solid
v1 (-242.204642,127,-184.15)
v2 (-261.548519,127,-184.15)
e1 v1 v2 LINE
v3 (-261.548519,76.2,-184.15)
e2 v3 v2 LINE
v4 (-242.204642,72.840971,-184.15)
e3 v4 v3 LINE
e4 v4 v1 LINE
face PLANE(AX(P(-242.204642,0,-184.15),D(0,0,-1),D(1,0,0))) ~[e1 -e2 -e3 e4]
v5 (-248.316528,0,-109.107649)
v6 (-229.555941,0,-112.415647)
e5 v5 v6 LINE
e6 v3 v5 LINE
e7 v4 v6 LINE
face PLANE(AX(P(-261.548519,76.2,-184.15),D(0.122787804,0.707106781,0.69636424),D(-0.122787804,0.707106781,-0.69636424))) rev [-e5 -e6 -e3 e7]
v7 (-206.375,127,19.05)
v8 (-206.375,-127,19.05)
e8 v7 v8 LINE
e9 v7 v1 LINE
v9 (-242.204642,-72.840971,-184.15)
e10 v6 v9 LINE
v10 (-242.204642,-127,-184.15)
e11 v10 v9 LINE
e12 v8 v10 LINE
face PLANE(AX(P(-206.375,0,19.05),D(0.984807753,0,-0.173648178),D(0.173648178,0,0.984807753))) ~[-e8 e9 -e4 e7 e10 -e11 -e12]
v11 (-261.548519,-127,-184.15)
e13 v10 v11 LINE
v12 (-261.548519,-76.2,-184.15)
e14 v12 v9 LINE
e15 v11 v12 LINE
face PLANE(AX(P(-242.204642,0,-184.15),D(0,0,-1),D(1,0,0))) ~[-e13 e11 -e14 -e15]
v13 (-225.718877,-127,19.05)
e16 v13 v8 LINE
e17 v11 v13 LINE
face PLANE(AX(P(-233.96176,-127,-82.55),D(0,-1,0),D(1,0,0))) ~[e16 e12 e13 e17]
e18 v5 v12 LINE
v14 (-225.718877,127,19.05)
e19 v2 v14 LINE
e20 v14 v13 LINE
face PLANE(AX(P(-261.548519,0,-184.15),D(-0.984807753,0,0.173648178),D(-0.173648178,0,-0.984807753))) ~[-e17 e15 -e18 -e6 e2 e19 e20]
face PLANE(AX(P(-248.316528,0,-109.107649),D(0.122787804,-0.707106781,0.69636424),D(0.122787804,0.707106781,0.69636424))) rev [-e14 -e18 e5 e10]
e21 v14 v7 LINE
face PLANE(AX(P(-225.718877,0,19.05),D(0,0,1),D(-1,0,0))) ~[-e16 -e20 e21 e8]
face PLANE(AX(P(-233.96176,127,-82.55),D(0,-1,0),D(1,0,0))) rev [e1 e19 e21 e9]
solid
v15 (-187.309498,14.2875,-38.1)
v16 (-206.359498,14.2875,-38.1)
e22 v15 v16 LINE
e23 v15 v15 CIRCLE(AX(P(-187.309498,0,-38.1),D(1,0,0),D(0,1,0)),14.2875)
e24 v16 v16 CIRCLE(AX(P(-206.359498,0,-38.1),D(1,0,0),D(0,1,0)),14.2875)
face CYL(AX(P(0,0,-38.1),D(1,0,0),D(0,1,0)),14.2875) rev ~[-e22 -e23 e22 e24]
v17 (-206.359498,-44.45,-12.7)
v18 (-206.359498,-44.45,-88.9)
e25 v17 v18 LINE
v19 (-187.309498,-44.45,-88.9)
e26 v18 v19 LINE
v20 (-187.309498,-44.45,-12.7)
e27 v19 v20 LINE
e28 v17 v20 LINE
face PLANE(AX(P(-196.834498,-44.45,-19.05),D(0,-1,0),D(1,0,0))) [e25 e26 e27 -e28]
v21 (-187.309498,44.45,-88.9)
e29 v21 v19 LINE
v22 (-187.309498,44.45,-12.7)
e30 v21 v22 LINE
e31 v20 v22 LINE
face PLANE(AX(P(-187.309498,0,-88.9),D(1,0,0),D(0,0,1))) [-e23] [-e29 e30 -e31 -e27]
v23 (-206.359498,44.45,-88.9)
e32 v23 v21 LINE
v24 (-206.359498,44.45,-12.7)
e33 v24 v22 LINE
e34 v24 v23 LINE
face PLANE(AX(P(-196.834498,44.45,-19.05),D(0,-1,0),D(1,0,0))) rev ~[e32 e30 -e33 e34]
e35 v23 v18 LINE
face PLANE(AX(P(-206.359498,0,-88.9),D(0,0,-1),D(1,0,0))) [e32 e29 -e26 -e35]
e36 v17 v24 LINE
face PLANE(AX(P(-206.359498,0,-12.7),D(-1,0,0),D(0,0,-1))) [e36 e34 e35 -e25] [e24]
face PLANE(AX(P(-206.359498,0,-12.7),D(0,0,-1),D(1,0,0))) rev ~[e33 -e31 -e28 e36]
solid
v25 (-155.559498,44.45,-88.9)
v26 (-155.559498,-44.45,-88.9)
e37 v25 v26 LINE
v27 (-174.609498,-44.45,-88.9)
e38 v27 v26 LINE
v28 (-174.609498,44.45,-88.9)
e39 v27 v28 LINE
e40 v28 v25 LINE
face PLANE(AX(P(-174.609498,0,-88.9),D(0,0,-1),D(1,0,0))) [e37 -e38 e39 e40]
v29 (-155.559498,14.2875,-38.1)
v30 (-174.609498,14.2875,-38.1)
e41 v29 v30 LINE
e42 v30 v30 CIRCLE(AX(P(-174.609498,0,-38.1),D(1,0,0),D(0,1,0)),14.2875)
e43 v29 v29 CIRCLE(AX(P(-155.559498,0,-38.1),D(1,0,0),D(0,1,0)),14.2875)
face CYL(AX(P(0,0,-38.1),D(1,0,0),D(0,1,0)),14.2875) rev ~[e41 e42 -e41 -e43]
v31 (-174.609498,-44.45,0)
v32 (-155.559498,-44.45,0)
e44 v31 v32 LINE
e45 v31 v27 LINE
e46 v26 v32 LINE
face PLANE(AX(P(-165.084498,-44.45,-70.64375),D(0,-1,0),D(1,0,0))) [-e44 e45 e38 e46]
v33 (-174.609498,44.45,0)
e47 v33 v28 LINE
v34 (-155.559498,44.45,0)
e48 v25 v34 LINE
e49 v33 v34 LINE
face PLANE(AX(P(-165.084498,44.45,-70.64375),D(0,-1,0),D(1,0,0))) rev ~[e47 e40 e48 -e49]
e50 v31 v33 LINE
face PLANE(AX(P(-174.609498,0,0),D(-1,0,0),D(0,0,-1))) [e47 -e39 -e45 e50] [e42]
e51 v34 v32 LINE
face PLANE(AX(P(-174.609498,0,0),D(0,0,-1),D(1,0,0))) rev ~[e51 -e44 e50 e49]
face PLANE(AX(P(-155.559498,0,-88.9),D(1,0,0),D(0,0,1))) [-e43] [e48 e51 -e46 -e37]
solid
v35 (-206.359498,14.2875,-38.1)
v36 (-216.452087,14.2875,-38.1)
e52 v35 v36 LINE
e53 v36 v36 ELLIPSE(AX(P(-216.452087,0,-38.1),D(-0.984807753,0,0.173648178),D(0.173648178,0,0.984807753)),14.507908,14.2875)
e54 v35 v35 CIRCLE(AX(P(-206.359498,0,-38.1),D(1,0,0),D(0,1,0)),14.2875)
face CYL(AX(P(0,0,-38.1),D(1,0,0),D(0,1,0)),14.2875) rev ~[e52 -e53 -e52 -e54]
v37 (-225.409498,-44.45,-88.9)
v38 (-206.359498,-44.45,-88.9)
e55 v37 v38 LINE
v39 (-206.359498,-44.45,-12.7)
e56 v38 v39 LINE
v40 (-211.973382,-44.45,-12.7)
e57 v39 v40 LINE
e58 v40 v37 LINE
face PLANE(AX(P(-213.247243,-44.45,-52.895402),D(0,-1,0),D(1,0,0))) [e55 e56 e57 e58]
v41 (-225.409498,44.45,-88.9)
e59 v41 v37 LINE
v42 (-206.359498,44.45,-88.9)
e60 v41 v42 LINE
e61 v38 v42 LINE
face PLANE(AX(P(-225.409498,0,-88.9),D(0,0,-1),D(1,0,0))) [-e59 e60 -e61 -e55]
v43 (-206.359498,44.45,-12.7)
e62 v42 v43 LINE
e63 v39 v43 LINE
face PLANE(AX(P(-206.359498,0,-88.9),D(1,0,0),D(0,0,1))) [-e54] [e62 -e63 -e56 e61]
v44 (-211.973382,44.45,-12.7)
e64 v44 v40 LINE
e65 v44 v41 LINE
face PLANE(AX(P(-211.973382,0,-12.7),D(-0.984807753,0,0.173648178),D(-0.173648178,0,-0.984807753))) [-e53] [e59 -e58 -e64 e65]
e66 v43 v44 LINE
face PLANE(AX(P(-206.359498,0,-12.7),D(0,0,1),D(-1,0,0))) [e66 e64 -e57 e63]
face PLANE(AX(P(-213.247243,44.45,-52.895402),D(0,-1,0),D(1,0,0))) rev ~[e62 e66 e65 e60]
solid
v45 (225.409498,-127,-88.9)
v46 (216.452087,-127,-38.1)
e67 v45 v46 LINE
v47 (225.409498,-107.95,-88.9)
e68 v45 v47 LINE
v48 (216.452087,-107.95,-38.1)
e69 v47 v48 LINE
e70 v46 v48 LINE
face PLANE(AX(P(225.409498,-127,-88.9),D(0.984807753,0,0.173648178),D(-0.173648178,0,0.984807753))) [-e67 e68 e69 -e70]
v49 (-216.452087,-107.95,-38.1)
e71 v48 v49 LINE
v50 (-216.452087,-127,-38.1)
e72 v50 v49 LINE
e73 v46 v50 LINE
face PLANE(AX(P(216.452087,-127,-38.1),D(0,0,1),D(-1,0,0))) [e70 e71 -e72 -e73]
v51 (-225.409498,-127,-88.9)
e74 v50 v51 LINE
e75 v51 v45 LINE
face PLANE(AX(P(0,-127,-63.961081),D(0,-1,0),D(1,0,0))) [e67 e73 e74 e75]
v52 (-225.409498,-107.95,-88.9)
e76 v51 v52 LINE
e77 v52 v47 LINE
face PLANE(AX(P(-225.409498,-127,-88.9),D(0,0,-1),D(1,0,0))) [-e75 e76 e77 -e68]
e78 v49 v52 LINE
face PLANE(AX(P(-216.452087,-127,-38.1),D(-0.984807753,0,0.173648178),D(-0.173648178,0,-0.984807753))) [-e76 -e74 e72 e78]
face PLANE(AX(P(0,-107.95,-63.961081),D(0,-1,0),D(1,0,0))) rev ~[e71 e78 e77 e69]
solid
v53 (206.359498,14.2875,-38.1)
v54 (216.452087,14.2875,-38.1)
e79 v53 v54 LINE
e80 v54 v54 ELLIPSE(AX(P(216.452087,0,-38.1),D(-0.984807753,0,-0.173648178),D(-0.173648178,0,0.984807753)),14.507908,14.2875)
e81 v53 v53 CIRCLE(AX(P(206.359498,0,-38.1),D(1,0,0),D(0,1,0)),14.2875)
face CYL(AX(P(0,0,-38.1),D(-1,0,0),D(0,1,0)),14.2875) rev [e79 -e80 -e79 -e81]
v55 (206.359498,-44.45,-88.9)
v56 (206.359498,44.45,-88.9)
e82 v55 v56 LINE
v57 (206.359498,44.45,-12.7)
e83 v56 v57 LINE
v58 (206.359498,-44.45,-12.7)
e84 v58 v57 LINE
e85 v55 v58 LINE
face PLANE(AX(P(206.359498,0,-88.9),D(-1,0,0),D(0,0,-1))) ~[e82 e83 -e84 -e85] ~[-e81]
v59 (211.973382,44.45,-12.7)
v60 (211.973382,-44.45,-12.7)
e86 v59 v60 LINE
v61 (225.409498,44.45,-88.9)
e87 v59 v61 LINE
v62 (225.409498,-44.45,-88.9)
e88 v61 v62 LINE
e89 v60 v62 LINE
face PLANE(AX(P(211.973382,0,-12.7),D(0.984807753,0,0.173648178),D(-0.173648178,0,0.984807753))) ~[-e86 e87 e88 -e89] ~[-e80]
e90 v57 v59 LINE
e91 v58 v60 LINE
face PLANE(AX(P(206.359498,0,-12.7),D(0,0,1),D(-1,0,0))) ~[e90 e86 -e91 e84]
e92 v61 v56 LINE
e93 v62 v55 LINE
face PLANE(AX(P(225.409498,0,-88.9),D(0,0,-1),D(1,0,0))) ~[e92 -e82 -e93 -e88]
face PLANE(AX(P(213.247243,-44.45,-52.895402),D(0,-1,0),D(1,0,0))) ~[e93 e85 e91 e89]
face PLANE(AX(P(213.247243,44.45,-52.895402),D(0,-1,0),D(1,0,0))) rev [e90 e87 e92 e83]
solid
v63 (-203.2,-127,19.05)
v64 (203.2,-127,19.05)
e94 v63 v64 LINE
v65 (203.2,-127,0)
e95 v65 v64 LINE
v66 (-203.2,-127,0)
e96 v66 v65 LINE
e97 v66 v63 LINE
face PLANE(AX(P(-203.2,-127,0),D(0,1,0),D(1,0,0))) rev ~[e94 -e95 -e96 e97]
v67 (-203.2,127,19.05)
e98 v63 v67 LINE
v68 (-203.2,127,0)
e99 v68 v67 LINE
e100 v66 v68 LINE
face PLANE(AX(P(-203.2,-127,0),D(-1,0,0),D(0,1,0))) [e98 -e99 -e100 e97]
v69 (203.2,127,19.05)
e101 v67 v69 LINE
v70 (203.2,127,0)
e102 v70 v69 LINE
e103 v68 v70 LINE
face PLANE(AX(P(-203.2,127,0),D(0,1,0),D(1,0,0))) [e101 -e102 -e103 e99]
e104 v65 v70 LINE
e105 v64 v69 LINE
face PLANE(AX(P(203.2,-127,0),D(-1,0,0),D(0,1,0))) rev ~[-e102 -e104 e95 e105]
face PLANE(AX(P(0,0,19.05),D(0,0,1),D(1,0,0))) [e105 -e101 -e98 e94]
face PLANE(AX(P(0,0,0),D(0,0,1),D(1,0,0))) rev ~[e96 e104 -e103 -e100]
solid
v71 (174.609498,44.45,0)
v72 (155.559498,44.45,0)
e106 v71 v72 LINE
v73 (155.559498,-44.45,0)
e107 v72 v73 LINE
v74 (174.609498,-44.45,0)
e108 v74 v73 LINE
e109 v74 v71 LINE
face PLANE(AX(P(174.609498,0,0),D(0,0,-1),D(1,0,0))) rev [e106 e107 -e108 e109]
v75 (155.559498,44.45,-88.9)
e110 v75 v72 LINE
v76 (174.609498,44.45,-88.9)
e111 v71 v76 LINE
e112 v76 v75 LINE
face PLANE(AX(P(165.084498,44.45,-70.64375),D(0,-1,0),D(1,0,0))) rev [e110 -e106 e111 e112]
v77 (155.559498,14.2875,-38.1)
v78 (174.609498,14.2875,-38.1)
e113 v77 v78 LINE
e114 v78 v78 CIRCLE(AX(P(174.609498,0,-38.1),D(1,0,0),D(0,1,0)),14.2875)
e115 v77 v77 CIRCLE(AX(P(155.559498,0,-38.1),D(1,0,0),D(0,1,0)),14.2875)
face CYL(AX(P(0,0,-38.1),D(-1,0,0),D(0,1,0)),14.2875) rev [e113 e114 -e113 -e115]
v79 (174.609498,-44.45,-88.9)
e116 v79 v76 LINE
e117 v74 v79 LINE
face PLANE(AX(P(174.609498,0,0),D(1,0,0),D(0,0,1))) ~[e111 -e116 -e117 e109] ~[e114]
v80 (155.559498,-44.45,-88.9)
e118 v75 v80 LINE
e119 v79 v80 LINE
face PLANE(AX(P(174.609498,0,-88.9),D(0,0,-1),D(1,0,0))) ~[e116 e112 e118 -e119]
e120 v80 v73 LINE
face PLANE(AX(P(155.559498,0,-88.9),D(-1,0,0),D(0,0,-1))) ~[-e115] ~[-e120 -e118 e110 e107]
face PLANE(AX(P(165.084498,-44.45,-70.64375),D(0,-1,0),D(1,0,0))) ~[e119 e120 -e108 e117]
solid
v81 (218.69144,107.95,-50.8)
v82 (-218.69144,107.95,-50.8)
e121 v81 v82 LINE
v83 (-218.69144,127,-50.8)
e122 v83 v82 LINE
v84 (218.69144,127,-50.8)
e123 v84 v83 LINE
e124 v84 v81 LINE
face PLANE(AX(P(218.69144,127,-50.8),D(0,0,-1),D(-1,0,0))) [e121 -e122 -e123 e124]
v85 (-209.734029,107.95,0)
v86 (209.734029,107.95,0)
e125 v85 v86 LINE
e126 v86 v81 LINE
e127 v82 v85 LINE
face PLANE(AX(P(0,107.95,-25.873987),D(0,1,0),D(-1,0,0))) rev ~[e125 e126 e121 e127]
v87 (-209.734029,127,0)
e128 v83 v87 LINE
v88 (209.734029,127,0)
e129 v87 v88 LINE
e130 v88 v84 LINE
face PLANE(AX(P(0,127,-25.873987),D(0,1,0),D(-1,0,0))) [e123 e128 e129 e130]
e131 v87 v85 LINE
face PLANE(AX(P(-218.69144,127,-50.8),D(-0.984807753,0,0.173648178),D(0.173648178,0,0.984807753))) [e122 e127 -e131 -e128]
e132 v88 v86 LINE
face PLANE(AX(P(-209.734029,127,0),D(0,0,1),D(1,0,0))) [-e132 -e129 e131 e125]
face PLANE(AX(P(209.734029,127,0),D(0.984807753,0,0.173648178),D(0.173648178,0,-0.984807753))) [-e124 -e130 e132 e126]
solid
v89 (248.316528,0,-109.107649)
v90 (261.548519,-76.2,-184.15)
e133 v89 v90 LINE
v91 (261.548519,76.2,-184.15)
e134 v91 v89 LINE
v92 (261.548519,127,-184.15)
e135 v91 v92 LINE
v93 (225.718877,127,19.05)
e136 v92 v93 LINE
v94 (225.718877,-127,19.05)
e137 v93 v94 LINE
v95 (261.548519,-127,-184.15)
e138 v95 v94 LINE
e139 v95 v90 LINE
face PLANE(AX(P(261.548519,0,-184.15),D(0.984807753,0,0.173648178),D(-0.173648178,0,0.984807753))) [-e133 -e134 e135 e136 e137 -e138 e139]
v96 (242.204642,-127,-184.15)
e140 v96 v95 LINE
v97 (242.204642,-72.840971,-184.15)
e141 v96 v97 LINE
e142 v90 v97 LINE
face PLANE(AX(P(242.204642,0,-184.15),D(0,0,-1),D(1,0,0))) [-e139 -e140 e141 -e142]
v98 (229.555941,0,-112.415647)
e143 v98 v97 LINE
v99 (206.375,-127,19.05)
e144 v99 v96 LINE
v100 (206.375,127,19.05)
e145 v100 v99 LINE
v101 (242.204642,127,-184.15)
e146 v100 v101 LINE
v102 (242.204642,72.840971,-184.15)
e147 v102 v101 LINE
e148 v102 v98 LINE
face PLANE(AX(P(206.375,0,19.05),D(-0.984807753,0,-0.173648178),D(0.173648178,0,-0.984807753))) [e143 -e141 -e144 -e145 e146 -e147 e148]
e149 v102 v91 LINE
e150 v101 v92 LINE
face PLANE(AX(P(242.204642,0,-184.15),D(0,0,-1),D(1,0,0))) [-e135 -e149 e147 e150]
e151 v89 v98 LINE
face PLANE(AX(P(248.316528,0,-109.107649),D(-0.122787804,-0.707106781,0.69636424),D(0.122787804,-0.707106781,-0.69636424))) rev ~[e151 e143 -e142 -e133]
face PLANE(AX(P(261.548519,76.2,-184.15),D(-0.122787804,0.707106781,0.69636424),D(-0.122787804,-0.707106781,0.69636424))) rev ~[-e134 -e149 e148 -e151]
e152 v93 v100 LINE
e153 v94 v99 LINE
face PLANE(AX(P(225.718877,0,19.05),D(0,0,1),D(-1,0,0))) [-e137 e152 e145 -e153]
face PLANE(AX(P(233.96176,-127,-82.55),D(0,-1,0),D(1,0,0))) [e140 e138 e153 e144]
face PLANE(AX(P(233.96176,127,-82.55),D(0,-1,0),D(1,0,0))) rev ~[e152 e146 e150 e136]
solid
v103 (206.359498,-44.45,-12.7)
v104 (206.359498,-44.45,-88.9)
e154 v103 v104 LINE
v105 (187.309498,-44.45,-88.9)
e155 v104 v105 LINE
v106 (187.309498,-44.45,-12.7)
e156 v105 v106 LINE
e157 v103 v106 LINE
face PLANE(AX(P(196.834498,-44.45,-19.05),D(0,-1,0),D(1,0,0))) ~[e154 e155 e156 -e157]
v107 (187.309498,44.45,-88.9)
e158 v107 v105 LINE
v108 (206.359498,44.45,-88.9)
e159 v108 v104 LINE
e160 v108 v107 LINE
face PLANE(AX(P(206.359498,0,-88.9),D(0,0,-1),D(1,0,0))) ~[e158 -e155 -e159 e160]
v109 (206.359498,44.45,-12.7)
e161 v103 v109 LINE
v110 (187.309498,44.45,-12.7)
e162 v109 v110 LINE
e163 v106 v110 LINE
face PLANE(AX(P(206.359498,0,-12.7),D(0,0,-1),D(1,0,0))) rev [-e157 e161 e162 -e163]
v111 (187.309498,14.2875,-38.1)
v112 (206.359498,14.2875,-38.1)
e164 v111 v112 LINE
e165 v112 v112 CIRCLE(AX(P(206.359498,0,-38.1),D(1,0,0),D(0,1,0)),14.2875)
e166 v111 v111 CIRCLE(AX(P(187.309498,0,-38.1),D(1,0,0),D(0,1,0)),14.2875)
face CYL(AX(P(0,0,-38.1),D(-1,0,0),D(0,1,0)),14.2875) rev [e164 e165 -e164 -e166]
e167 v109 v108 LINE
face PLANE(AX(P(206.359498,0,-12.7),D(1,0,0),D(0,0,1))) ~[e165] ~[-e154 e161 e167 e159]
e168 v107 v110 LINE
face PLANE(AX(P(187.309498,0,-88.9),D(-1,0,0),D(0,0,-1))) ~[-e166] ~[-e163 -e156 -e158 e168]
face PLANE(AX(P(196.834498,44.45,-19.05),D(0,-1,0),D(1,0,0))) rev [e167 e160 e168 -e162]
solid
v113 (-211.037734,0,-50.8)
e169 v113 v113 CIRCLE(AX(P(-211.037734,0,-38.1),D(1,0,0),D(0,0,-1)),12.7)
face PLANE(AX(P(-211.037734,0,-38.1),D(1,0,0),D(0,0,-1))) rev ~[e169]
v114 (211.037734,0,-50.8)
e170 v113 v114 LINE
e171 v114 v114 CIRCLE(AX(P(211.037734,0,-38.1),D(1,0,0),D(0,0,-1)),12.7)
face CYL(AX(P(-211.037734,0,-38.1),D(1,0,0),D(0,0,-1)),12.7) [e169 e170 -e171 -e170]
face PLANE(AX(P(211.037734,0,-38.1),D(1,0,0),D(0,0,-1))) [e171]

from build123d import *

# Parameters (mm, degrees)
F0_W          = 406.4
F0_H          = 254
F1_DEPTH      = 19.05
F3_DEPTH      = 127
F3_DEPTH_BACK = 127
F5_DEPTH      = 19.05
F8_DEPTH      = 19.05
F9_W          = 4.678236725
F9_H          = 12.7
F11_DEPTH     = 44.45
F10_R         = 14.2875
F10_R_2       = 12.7
F12_DEPTH     = 261.5495194364
F9_W_2        = 366.59723186
F9_W_3        = 19.05
F9_W_4        = 12.7
F9_H_2        = 36.5125
F9_H_3        = 23.8125
F9_H_4        = 1.5875
F15_DEPTH     = 44.45
F16_DEPTH     = 261.5495194364
F19_DEPTH     = 19.05
F9_H_5        = 38.1
F20_DEPTH     = 44.45
F21_DEPTH     = 261.5495194364


# Not quite as in the source:
# - a feature names something its author has since deleted; it is built from what else it names


with BuildPart() as f1:
    # F0 (on Top) → F1 (new body)
    with BuildSketch(Plane.XY):
        Rectangle(F0_W, F0_H)
    extrude(amount=F1_DEPTH)


with BuildPart() as f3:
    # F2 (on Front) → F3 (new body, two sides)
    with BuildSketch(Plane.XZ) as f3_sk:
        Polygon((261.5485194364, -184.15), (225.7188769564, 19.05), (206.375, 19.05), (242.20464248, -184.15), align=None)
    extrude(amount=F3_DEPTH)
    extrude(f3_sk.sketch, amount=-F3_DEPTH_BACK)

    # F4 (on face) → F5 (cut, through all)
    with BuildSketch(Plane(origin=(222.1703618674, 0, 39.174629111), x_dir=(0, 1, 0), z_dir=(0.984807753, 0, 0.1736481777))):
        Polygon((0, -150.5697714888), (-76.2000000001, -226.7697714888), (76.2000000001, -226.7697714888), align=None)
    extrude(amount=-F5_DEPTH, mode=Mode.SUBTRACT)


with BuildPart() as f6_1:
    # F6: instance of F3
    add(f3.part.mirror(Plane.YZ))


with BuildPart() as f8:
    # F7 (on face) → F8 (new body)
    with BuildSketch(Plane.XZ.offset(127)):
        Polygon((-216.4520869475, -38.1), (-225.4094975675, -88.9), (225.4094975675, -88.9), (216.4520869475, -38.1), align=None)
    extrude(amount=-F8_DEPTH)


with BuildPart() as f11:
    # F9 (on Front) → F11 (new body, symmetric)
    with BuildSketch(Plane.XZ):
        Polygon((-211.0377342925, -38.1), (-211.0377342925, -25.4), (-206.3594975675, -25.4), (-206.3594975675, -12.7), (-211.9733816375, -12.7), (-225.4094975675, -88.9), (-206.3594975675, -88.9), (-206.3594975675, -50.8), (-211.0377342925, -50.8), align=None)
        with Locations((-208.69861593, -31.75)):
            Rectangle(F9_W, F9_H)
        with Locations((-208.69861593, -44.45)):
            Rectangle(F9_W, F9_H)
    extrude(amount=F11_DEPTH, both=True)

    # F10 (on Right) → F12 (cut, through all)
    with BuildSketch(Plane.YZ):
        with Locations((0, -38.1)):
            Circle(F10_R)
        with Locations((0, -38.1)):
            Circle(F10_R_2, mode=Mode.SUBTRACT)
        with Locations((0, -38.1)):
            Circle(F10_R_2)
    extrude(amount=-F12_DEPTH, mode=Mode.SUBTRACT)


with BuildPart() as f13:
    # F9 (on Front) → F13 (revolve)
    with BuildSketch(Plane.XZ):
        with Locations((27.7391183625, -44.45)):
            Rectangle(F9_W_2, F9_H)
        with Locations((-208.69861593, -44.45)):
            Rectangle(F9_W, F9_H)
        with Locations((-165.0844975675, -44.45)):
            Rectangle(F9_W_3, F9_H)
        with Locations((-196.8344975675, -44.45)):
            Rectangle(F9_W_3, F9_H)
        with Locations((-180.9594975675, -44.45)):
            Rectangle(F9_W_4, F9_H)
    revolve(axis=Axis((0, 0, -38.1), (1, 0, 0)))


with BuildPart() as f14_1:
    # F14: instance of F11
    add(f11.part.mirror(Plane.YZ))


with BuildPart() as f15:
    # F9 (on Front) → F15 (new body, symmetric)
    with BuildSketch(Plane.XZ):
        with Locations((-165.0844975675, -70.64375)):
            Rectangle(F9_W_3, F9_H_2)
        with Locations((-165.0844975675, -11.90625)):
            Rectangle(F9_W_3, F9_H_3)
        with Locations((-165.0844975675, -24.60625)):
            Rectangle(F9_W_3, F9_H_4)
        with Locations((-165.0844975675, -31.75)):
            Rectangle(F9_W_3, F9_H)
        with Locations((-165.0844975675, -51.59375)):
            Rectangle(F9_W_3, F9_H_4)
        with Locations((-165.0844975675, -44.45)):
            Rectangle(F9_W_3, F9_H)
    extrude(amount=F15_DEPTH, both=True)

    # F10 (on Right) → F16 (cut, through all)
    with BuildSketch(Plane.YZ):
        with Locations((0, -38.1)):
            Circle(F10_R)
        with Locations((0, -38.1)):
            Circle(F10_R_2, mode=Mode.SUBTRACT)
        with Locations((0, -38.1)):
            Circle(F10_R_2)
    extrude(amount=-F16_DEPTH, mode=Mode.SUBTRACT)


with BuildPart() as f17_1:
    # F17: instance of F15
    add(f15.part.mirror(Plane.YZ))


with BuildPart() as f19:
    # F18 (on face) → F19 (new body)
    with BuildSketch(Plane(origin=(0, 127, 0), x_dir=(-1, 0, 0), z_dir=(0, 1, 0))):
        Polygon((209.7340289825, 0), (-209.7340289825, 0), (-218.6914396025, -50.8), (218.6914396025, -50.8), align=None)
    extrude(amount=-F19_DEPTH)


with BuildPart() as f20:
    # F9 (on Front) → F20 (new body, symmetric)
    with BuildSketch(Plane.XZ):
        with Locations((-196.8344975675, -19.05)):
            Rectangle(F9_W_3, F9_H)
        with Locations((-196.8344975675, -31.75)):
            Rectangle(F9_W_3, F9_H)
        with Locations((-196.8344975675, -44.45)):
            Rectangle(F9_W_3, F9_H)
        with Locations((-196.8344975675, -69.85)):
            Rectangle(F9_W_3, F9_H_5)
    extrude(amount=F20_DEPTH, both=True)

    # F10 (on Right) → F21 (cut, through all)
    with BuildSketch(Plane.YZ):
        with Locations((0, -38.1)):
            Circle(F10_R)
        with Locations((0, -38.1)):
            Circle(F10_R_2, mode=Mode.SUBTRACT)
        with Locations((0, -38.1)):
            Circle(F10_R_2)
    extrude(amount=-F21_DEPTH, mode=Mode.SUBTRACT)


with BuildPart() as f22_1:
    # F22: instance of F20
    add(f20.part.mirror(Plane.YZ))


solid = Compound([f1.part, f3.part, f6_1.part, f8.part, f11.part, f13.part, f14_1.part, f15.part, f17_1.part, f19.part, f20.part, f22_1.part])
